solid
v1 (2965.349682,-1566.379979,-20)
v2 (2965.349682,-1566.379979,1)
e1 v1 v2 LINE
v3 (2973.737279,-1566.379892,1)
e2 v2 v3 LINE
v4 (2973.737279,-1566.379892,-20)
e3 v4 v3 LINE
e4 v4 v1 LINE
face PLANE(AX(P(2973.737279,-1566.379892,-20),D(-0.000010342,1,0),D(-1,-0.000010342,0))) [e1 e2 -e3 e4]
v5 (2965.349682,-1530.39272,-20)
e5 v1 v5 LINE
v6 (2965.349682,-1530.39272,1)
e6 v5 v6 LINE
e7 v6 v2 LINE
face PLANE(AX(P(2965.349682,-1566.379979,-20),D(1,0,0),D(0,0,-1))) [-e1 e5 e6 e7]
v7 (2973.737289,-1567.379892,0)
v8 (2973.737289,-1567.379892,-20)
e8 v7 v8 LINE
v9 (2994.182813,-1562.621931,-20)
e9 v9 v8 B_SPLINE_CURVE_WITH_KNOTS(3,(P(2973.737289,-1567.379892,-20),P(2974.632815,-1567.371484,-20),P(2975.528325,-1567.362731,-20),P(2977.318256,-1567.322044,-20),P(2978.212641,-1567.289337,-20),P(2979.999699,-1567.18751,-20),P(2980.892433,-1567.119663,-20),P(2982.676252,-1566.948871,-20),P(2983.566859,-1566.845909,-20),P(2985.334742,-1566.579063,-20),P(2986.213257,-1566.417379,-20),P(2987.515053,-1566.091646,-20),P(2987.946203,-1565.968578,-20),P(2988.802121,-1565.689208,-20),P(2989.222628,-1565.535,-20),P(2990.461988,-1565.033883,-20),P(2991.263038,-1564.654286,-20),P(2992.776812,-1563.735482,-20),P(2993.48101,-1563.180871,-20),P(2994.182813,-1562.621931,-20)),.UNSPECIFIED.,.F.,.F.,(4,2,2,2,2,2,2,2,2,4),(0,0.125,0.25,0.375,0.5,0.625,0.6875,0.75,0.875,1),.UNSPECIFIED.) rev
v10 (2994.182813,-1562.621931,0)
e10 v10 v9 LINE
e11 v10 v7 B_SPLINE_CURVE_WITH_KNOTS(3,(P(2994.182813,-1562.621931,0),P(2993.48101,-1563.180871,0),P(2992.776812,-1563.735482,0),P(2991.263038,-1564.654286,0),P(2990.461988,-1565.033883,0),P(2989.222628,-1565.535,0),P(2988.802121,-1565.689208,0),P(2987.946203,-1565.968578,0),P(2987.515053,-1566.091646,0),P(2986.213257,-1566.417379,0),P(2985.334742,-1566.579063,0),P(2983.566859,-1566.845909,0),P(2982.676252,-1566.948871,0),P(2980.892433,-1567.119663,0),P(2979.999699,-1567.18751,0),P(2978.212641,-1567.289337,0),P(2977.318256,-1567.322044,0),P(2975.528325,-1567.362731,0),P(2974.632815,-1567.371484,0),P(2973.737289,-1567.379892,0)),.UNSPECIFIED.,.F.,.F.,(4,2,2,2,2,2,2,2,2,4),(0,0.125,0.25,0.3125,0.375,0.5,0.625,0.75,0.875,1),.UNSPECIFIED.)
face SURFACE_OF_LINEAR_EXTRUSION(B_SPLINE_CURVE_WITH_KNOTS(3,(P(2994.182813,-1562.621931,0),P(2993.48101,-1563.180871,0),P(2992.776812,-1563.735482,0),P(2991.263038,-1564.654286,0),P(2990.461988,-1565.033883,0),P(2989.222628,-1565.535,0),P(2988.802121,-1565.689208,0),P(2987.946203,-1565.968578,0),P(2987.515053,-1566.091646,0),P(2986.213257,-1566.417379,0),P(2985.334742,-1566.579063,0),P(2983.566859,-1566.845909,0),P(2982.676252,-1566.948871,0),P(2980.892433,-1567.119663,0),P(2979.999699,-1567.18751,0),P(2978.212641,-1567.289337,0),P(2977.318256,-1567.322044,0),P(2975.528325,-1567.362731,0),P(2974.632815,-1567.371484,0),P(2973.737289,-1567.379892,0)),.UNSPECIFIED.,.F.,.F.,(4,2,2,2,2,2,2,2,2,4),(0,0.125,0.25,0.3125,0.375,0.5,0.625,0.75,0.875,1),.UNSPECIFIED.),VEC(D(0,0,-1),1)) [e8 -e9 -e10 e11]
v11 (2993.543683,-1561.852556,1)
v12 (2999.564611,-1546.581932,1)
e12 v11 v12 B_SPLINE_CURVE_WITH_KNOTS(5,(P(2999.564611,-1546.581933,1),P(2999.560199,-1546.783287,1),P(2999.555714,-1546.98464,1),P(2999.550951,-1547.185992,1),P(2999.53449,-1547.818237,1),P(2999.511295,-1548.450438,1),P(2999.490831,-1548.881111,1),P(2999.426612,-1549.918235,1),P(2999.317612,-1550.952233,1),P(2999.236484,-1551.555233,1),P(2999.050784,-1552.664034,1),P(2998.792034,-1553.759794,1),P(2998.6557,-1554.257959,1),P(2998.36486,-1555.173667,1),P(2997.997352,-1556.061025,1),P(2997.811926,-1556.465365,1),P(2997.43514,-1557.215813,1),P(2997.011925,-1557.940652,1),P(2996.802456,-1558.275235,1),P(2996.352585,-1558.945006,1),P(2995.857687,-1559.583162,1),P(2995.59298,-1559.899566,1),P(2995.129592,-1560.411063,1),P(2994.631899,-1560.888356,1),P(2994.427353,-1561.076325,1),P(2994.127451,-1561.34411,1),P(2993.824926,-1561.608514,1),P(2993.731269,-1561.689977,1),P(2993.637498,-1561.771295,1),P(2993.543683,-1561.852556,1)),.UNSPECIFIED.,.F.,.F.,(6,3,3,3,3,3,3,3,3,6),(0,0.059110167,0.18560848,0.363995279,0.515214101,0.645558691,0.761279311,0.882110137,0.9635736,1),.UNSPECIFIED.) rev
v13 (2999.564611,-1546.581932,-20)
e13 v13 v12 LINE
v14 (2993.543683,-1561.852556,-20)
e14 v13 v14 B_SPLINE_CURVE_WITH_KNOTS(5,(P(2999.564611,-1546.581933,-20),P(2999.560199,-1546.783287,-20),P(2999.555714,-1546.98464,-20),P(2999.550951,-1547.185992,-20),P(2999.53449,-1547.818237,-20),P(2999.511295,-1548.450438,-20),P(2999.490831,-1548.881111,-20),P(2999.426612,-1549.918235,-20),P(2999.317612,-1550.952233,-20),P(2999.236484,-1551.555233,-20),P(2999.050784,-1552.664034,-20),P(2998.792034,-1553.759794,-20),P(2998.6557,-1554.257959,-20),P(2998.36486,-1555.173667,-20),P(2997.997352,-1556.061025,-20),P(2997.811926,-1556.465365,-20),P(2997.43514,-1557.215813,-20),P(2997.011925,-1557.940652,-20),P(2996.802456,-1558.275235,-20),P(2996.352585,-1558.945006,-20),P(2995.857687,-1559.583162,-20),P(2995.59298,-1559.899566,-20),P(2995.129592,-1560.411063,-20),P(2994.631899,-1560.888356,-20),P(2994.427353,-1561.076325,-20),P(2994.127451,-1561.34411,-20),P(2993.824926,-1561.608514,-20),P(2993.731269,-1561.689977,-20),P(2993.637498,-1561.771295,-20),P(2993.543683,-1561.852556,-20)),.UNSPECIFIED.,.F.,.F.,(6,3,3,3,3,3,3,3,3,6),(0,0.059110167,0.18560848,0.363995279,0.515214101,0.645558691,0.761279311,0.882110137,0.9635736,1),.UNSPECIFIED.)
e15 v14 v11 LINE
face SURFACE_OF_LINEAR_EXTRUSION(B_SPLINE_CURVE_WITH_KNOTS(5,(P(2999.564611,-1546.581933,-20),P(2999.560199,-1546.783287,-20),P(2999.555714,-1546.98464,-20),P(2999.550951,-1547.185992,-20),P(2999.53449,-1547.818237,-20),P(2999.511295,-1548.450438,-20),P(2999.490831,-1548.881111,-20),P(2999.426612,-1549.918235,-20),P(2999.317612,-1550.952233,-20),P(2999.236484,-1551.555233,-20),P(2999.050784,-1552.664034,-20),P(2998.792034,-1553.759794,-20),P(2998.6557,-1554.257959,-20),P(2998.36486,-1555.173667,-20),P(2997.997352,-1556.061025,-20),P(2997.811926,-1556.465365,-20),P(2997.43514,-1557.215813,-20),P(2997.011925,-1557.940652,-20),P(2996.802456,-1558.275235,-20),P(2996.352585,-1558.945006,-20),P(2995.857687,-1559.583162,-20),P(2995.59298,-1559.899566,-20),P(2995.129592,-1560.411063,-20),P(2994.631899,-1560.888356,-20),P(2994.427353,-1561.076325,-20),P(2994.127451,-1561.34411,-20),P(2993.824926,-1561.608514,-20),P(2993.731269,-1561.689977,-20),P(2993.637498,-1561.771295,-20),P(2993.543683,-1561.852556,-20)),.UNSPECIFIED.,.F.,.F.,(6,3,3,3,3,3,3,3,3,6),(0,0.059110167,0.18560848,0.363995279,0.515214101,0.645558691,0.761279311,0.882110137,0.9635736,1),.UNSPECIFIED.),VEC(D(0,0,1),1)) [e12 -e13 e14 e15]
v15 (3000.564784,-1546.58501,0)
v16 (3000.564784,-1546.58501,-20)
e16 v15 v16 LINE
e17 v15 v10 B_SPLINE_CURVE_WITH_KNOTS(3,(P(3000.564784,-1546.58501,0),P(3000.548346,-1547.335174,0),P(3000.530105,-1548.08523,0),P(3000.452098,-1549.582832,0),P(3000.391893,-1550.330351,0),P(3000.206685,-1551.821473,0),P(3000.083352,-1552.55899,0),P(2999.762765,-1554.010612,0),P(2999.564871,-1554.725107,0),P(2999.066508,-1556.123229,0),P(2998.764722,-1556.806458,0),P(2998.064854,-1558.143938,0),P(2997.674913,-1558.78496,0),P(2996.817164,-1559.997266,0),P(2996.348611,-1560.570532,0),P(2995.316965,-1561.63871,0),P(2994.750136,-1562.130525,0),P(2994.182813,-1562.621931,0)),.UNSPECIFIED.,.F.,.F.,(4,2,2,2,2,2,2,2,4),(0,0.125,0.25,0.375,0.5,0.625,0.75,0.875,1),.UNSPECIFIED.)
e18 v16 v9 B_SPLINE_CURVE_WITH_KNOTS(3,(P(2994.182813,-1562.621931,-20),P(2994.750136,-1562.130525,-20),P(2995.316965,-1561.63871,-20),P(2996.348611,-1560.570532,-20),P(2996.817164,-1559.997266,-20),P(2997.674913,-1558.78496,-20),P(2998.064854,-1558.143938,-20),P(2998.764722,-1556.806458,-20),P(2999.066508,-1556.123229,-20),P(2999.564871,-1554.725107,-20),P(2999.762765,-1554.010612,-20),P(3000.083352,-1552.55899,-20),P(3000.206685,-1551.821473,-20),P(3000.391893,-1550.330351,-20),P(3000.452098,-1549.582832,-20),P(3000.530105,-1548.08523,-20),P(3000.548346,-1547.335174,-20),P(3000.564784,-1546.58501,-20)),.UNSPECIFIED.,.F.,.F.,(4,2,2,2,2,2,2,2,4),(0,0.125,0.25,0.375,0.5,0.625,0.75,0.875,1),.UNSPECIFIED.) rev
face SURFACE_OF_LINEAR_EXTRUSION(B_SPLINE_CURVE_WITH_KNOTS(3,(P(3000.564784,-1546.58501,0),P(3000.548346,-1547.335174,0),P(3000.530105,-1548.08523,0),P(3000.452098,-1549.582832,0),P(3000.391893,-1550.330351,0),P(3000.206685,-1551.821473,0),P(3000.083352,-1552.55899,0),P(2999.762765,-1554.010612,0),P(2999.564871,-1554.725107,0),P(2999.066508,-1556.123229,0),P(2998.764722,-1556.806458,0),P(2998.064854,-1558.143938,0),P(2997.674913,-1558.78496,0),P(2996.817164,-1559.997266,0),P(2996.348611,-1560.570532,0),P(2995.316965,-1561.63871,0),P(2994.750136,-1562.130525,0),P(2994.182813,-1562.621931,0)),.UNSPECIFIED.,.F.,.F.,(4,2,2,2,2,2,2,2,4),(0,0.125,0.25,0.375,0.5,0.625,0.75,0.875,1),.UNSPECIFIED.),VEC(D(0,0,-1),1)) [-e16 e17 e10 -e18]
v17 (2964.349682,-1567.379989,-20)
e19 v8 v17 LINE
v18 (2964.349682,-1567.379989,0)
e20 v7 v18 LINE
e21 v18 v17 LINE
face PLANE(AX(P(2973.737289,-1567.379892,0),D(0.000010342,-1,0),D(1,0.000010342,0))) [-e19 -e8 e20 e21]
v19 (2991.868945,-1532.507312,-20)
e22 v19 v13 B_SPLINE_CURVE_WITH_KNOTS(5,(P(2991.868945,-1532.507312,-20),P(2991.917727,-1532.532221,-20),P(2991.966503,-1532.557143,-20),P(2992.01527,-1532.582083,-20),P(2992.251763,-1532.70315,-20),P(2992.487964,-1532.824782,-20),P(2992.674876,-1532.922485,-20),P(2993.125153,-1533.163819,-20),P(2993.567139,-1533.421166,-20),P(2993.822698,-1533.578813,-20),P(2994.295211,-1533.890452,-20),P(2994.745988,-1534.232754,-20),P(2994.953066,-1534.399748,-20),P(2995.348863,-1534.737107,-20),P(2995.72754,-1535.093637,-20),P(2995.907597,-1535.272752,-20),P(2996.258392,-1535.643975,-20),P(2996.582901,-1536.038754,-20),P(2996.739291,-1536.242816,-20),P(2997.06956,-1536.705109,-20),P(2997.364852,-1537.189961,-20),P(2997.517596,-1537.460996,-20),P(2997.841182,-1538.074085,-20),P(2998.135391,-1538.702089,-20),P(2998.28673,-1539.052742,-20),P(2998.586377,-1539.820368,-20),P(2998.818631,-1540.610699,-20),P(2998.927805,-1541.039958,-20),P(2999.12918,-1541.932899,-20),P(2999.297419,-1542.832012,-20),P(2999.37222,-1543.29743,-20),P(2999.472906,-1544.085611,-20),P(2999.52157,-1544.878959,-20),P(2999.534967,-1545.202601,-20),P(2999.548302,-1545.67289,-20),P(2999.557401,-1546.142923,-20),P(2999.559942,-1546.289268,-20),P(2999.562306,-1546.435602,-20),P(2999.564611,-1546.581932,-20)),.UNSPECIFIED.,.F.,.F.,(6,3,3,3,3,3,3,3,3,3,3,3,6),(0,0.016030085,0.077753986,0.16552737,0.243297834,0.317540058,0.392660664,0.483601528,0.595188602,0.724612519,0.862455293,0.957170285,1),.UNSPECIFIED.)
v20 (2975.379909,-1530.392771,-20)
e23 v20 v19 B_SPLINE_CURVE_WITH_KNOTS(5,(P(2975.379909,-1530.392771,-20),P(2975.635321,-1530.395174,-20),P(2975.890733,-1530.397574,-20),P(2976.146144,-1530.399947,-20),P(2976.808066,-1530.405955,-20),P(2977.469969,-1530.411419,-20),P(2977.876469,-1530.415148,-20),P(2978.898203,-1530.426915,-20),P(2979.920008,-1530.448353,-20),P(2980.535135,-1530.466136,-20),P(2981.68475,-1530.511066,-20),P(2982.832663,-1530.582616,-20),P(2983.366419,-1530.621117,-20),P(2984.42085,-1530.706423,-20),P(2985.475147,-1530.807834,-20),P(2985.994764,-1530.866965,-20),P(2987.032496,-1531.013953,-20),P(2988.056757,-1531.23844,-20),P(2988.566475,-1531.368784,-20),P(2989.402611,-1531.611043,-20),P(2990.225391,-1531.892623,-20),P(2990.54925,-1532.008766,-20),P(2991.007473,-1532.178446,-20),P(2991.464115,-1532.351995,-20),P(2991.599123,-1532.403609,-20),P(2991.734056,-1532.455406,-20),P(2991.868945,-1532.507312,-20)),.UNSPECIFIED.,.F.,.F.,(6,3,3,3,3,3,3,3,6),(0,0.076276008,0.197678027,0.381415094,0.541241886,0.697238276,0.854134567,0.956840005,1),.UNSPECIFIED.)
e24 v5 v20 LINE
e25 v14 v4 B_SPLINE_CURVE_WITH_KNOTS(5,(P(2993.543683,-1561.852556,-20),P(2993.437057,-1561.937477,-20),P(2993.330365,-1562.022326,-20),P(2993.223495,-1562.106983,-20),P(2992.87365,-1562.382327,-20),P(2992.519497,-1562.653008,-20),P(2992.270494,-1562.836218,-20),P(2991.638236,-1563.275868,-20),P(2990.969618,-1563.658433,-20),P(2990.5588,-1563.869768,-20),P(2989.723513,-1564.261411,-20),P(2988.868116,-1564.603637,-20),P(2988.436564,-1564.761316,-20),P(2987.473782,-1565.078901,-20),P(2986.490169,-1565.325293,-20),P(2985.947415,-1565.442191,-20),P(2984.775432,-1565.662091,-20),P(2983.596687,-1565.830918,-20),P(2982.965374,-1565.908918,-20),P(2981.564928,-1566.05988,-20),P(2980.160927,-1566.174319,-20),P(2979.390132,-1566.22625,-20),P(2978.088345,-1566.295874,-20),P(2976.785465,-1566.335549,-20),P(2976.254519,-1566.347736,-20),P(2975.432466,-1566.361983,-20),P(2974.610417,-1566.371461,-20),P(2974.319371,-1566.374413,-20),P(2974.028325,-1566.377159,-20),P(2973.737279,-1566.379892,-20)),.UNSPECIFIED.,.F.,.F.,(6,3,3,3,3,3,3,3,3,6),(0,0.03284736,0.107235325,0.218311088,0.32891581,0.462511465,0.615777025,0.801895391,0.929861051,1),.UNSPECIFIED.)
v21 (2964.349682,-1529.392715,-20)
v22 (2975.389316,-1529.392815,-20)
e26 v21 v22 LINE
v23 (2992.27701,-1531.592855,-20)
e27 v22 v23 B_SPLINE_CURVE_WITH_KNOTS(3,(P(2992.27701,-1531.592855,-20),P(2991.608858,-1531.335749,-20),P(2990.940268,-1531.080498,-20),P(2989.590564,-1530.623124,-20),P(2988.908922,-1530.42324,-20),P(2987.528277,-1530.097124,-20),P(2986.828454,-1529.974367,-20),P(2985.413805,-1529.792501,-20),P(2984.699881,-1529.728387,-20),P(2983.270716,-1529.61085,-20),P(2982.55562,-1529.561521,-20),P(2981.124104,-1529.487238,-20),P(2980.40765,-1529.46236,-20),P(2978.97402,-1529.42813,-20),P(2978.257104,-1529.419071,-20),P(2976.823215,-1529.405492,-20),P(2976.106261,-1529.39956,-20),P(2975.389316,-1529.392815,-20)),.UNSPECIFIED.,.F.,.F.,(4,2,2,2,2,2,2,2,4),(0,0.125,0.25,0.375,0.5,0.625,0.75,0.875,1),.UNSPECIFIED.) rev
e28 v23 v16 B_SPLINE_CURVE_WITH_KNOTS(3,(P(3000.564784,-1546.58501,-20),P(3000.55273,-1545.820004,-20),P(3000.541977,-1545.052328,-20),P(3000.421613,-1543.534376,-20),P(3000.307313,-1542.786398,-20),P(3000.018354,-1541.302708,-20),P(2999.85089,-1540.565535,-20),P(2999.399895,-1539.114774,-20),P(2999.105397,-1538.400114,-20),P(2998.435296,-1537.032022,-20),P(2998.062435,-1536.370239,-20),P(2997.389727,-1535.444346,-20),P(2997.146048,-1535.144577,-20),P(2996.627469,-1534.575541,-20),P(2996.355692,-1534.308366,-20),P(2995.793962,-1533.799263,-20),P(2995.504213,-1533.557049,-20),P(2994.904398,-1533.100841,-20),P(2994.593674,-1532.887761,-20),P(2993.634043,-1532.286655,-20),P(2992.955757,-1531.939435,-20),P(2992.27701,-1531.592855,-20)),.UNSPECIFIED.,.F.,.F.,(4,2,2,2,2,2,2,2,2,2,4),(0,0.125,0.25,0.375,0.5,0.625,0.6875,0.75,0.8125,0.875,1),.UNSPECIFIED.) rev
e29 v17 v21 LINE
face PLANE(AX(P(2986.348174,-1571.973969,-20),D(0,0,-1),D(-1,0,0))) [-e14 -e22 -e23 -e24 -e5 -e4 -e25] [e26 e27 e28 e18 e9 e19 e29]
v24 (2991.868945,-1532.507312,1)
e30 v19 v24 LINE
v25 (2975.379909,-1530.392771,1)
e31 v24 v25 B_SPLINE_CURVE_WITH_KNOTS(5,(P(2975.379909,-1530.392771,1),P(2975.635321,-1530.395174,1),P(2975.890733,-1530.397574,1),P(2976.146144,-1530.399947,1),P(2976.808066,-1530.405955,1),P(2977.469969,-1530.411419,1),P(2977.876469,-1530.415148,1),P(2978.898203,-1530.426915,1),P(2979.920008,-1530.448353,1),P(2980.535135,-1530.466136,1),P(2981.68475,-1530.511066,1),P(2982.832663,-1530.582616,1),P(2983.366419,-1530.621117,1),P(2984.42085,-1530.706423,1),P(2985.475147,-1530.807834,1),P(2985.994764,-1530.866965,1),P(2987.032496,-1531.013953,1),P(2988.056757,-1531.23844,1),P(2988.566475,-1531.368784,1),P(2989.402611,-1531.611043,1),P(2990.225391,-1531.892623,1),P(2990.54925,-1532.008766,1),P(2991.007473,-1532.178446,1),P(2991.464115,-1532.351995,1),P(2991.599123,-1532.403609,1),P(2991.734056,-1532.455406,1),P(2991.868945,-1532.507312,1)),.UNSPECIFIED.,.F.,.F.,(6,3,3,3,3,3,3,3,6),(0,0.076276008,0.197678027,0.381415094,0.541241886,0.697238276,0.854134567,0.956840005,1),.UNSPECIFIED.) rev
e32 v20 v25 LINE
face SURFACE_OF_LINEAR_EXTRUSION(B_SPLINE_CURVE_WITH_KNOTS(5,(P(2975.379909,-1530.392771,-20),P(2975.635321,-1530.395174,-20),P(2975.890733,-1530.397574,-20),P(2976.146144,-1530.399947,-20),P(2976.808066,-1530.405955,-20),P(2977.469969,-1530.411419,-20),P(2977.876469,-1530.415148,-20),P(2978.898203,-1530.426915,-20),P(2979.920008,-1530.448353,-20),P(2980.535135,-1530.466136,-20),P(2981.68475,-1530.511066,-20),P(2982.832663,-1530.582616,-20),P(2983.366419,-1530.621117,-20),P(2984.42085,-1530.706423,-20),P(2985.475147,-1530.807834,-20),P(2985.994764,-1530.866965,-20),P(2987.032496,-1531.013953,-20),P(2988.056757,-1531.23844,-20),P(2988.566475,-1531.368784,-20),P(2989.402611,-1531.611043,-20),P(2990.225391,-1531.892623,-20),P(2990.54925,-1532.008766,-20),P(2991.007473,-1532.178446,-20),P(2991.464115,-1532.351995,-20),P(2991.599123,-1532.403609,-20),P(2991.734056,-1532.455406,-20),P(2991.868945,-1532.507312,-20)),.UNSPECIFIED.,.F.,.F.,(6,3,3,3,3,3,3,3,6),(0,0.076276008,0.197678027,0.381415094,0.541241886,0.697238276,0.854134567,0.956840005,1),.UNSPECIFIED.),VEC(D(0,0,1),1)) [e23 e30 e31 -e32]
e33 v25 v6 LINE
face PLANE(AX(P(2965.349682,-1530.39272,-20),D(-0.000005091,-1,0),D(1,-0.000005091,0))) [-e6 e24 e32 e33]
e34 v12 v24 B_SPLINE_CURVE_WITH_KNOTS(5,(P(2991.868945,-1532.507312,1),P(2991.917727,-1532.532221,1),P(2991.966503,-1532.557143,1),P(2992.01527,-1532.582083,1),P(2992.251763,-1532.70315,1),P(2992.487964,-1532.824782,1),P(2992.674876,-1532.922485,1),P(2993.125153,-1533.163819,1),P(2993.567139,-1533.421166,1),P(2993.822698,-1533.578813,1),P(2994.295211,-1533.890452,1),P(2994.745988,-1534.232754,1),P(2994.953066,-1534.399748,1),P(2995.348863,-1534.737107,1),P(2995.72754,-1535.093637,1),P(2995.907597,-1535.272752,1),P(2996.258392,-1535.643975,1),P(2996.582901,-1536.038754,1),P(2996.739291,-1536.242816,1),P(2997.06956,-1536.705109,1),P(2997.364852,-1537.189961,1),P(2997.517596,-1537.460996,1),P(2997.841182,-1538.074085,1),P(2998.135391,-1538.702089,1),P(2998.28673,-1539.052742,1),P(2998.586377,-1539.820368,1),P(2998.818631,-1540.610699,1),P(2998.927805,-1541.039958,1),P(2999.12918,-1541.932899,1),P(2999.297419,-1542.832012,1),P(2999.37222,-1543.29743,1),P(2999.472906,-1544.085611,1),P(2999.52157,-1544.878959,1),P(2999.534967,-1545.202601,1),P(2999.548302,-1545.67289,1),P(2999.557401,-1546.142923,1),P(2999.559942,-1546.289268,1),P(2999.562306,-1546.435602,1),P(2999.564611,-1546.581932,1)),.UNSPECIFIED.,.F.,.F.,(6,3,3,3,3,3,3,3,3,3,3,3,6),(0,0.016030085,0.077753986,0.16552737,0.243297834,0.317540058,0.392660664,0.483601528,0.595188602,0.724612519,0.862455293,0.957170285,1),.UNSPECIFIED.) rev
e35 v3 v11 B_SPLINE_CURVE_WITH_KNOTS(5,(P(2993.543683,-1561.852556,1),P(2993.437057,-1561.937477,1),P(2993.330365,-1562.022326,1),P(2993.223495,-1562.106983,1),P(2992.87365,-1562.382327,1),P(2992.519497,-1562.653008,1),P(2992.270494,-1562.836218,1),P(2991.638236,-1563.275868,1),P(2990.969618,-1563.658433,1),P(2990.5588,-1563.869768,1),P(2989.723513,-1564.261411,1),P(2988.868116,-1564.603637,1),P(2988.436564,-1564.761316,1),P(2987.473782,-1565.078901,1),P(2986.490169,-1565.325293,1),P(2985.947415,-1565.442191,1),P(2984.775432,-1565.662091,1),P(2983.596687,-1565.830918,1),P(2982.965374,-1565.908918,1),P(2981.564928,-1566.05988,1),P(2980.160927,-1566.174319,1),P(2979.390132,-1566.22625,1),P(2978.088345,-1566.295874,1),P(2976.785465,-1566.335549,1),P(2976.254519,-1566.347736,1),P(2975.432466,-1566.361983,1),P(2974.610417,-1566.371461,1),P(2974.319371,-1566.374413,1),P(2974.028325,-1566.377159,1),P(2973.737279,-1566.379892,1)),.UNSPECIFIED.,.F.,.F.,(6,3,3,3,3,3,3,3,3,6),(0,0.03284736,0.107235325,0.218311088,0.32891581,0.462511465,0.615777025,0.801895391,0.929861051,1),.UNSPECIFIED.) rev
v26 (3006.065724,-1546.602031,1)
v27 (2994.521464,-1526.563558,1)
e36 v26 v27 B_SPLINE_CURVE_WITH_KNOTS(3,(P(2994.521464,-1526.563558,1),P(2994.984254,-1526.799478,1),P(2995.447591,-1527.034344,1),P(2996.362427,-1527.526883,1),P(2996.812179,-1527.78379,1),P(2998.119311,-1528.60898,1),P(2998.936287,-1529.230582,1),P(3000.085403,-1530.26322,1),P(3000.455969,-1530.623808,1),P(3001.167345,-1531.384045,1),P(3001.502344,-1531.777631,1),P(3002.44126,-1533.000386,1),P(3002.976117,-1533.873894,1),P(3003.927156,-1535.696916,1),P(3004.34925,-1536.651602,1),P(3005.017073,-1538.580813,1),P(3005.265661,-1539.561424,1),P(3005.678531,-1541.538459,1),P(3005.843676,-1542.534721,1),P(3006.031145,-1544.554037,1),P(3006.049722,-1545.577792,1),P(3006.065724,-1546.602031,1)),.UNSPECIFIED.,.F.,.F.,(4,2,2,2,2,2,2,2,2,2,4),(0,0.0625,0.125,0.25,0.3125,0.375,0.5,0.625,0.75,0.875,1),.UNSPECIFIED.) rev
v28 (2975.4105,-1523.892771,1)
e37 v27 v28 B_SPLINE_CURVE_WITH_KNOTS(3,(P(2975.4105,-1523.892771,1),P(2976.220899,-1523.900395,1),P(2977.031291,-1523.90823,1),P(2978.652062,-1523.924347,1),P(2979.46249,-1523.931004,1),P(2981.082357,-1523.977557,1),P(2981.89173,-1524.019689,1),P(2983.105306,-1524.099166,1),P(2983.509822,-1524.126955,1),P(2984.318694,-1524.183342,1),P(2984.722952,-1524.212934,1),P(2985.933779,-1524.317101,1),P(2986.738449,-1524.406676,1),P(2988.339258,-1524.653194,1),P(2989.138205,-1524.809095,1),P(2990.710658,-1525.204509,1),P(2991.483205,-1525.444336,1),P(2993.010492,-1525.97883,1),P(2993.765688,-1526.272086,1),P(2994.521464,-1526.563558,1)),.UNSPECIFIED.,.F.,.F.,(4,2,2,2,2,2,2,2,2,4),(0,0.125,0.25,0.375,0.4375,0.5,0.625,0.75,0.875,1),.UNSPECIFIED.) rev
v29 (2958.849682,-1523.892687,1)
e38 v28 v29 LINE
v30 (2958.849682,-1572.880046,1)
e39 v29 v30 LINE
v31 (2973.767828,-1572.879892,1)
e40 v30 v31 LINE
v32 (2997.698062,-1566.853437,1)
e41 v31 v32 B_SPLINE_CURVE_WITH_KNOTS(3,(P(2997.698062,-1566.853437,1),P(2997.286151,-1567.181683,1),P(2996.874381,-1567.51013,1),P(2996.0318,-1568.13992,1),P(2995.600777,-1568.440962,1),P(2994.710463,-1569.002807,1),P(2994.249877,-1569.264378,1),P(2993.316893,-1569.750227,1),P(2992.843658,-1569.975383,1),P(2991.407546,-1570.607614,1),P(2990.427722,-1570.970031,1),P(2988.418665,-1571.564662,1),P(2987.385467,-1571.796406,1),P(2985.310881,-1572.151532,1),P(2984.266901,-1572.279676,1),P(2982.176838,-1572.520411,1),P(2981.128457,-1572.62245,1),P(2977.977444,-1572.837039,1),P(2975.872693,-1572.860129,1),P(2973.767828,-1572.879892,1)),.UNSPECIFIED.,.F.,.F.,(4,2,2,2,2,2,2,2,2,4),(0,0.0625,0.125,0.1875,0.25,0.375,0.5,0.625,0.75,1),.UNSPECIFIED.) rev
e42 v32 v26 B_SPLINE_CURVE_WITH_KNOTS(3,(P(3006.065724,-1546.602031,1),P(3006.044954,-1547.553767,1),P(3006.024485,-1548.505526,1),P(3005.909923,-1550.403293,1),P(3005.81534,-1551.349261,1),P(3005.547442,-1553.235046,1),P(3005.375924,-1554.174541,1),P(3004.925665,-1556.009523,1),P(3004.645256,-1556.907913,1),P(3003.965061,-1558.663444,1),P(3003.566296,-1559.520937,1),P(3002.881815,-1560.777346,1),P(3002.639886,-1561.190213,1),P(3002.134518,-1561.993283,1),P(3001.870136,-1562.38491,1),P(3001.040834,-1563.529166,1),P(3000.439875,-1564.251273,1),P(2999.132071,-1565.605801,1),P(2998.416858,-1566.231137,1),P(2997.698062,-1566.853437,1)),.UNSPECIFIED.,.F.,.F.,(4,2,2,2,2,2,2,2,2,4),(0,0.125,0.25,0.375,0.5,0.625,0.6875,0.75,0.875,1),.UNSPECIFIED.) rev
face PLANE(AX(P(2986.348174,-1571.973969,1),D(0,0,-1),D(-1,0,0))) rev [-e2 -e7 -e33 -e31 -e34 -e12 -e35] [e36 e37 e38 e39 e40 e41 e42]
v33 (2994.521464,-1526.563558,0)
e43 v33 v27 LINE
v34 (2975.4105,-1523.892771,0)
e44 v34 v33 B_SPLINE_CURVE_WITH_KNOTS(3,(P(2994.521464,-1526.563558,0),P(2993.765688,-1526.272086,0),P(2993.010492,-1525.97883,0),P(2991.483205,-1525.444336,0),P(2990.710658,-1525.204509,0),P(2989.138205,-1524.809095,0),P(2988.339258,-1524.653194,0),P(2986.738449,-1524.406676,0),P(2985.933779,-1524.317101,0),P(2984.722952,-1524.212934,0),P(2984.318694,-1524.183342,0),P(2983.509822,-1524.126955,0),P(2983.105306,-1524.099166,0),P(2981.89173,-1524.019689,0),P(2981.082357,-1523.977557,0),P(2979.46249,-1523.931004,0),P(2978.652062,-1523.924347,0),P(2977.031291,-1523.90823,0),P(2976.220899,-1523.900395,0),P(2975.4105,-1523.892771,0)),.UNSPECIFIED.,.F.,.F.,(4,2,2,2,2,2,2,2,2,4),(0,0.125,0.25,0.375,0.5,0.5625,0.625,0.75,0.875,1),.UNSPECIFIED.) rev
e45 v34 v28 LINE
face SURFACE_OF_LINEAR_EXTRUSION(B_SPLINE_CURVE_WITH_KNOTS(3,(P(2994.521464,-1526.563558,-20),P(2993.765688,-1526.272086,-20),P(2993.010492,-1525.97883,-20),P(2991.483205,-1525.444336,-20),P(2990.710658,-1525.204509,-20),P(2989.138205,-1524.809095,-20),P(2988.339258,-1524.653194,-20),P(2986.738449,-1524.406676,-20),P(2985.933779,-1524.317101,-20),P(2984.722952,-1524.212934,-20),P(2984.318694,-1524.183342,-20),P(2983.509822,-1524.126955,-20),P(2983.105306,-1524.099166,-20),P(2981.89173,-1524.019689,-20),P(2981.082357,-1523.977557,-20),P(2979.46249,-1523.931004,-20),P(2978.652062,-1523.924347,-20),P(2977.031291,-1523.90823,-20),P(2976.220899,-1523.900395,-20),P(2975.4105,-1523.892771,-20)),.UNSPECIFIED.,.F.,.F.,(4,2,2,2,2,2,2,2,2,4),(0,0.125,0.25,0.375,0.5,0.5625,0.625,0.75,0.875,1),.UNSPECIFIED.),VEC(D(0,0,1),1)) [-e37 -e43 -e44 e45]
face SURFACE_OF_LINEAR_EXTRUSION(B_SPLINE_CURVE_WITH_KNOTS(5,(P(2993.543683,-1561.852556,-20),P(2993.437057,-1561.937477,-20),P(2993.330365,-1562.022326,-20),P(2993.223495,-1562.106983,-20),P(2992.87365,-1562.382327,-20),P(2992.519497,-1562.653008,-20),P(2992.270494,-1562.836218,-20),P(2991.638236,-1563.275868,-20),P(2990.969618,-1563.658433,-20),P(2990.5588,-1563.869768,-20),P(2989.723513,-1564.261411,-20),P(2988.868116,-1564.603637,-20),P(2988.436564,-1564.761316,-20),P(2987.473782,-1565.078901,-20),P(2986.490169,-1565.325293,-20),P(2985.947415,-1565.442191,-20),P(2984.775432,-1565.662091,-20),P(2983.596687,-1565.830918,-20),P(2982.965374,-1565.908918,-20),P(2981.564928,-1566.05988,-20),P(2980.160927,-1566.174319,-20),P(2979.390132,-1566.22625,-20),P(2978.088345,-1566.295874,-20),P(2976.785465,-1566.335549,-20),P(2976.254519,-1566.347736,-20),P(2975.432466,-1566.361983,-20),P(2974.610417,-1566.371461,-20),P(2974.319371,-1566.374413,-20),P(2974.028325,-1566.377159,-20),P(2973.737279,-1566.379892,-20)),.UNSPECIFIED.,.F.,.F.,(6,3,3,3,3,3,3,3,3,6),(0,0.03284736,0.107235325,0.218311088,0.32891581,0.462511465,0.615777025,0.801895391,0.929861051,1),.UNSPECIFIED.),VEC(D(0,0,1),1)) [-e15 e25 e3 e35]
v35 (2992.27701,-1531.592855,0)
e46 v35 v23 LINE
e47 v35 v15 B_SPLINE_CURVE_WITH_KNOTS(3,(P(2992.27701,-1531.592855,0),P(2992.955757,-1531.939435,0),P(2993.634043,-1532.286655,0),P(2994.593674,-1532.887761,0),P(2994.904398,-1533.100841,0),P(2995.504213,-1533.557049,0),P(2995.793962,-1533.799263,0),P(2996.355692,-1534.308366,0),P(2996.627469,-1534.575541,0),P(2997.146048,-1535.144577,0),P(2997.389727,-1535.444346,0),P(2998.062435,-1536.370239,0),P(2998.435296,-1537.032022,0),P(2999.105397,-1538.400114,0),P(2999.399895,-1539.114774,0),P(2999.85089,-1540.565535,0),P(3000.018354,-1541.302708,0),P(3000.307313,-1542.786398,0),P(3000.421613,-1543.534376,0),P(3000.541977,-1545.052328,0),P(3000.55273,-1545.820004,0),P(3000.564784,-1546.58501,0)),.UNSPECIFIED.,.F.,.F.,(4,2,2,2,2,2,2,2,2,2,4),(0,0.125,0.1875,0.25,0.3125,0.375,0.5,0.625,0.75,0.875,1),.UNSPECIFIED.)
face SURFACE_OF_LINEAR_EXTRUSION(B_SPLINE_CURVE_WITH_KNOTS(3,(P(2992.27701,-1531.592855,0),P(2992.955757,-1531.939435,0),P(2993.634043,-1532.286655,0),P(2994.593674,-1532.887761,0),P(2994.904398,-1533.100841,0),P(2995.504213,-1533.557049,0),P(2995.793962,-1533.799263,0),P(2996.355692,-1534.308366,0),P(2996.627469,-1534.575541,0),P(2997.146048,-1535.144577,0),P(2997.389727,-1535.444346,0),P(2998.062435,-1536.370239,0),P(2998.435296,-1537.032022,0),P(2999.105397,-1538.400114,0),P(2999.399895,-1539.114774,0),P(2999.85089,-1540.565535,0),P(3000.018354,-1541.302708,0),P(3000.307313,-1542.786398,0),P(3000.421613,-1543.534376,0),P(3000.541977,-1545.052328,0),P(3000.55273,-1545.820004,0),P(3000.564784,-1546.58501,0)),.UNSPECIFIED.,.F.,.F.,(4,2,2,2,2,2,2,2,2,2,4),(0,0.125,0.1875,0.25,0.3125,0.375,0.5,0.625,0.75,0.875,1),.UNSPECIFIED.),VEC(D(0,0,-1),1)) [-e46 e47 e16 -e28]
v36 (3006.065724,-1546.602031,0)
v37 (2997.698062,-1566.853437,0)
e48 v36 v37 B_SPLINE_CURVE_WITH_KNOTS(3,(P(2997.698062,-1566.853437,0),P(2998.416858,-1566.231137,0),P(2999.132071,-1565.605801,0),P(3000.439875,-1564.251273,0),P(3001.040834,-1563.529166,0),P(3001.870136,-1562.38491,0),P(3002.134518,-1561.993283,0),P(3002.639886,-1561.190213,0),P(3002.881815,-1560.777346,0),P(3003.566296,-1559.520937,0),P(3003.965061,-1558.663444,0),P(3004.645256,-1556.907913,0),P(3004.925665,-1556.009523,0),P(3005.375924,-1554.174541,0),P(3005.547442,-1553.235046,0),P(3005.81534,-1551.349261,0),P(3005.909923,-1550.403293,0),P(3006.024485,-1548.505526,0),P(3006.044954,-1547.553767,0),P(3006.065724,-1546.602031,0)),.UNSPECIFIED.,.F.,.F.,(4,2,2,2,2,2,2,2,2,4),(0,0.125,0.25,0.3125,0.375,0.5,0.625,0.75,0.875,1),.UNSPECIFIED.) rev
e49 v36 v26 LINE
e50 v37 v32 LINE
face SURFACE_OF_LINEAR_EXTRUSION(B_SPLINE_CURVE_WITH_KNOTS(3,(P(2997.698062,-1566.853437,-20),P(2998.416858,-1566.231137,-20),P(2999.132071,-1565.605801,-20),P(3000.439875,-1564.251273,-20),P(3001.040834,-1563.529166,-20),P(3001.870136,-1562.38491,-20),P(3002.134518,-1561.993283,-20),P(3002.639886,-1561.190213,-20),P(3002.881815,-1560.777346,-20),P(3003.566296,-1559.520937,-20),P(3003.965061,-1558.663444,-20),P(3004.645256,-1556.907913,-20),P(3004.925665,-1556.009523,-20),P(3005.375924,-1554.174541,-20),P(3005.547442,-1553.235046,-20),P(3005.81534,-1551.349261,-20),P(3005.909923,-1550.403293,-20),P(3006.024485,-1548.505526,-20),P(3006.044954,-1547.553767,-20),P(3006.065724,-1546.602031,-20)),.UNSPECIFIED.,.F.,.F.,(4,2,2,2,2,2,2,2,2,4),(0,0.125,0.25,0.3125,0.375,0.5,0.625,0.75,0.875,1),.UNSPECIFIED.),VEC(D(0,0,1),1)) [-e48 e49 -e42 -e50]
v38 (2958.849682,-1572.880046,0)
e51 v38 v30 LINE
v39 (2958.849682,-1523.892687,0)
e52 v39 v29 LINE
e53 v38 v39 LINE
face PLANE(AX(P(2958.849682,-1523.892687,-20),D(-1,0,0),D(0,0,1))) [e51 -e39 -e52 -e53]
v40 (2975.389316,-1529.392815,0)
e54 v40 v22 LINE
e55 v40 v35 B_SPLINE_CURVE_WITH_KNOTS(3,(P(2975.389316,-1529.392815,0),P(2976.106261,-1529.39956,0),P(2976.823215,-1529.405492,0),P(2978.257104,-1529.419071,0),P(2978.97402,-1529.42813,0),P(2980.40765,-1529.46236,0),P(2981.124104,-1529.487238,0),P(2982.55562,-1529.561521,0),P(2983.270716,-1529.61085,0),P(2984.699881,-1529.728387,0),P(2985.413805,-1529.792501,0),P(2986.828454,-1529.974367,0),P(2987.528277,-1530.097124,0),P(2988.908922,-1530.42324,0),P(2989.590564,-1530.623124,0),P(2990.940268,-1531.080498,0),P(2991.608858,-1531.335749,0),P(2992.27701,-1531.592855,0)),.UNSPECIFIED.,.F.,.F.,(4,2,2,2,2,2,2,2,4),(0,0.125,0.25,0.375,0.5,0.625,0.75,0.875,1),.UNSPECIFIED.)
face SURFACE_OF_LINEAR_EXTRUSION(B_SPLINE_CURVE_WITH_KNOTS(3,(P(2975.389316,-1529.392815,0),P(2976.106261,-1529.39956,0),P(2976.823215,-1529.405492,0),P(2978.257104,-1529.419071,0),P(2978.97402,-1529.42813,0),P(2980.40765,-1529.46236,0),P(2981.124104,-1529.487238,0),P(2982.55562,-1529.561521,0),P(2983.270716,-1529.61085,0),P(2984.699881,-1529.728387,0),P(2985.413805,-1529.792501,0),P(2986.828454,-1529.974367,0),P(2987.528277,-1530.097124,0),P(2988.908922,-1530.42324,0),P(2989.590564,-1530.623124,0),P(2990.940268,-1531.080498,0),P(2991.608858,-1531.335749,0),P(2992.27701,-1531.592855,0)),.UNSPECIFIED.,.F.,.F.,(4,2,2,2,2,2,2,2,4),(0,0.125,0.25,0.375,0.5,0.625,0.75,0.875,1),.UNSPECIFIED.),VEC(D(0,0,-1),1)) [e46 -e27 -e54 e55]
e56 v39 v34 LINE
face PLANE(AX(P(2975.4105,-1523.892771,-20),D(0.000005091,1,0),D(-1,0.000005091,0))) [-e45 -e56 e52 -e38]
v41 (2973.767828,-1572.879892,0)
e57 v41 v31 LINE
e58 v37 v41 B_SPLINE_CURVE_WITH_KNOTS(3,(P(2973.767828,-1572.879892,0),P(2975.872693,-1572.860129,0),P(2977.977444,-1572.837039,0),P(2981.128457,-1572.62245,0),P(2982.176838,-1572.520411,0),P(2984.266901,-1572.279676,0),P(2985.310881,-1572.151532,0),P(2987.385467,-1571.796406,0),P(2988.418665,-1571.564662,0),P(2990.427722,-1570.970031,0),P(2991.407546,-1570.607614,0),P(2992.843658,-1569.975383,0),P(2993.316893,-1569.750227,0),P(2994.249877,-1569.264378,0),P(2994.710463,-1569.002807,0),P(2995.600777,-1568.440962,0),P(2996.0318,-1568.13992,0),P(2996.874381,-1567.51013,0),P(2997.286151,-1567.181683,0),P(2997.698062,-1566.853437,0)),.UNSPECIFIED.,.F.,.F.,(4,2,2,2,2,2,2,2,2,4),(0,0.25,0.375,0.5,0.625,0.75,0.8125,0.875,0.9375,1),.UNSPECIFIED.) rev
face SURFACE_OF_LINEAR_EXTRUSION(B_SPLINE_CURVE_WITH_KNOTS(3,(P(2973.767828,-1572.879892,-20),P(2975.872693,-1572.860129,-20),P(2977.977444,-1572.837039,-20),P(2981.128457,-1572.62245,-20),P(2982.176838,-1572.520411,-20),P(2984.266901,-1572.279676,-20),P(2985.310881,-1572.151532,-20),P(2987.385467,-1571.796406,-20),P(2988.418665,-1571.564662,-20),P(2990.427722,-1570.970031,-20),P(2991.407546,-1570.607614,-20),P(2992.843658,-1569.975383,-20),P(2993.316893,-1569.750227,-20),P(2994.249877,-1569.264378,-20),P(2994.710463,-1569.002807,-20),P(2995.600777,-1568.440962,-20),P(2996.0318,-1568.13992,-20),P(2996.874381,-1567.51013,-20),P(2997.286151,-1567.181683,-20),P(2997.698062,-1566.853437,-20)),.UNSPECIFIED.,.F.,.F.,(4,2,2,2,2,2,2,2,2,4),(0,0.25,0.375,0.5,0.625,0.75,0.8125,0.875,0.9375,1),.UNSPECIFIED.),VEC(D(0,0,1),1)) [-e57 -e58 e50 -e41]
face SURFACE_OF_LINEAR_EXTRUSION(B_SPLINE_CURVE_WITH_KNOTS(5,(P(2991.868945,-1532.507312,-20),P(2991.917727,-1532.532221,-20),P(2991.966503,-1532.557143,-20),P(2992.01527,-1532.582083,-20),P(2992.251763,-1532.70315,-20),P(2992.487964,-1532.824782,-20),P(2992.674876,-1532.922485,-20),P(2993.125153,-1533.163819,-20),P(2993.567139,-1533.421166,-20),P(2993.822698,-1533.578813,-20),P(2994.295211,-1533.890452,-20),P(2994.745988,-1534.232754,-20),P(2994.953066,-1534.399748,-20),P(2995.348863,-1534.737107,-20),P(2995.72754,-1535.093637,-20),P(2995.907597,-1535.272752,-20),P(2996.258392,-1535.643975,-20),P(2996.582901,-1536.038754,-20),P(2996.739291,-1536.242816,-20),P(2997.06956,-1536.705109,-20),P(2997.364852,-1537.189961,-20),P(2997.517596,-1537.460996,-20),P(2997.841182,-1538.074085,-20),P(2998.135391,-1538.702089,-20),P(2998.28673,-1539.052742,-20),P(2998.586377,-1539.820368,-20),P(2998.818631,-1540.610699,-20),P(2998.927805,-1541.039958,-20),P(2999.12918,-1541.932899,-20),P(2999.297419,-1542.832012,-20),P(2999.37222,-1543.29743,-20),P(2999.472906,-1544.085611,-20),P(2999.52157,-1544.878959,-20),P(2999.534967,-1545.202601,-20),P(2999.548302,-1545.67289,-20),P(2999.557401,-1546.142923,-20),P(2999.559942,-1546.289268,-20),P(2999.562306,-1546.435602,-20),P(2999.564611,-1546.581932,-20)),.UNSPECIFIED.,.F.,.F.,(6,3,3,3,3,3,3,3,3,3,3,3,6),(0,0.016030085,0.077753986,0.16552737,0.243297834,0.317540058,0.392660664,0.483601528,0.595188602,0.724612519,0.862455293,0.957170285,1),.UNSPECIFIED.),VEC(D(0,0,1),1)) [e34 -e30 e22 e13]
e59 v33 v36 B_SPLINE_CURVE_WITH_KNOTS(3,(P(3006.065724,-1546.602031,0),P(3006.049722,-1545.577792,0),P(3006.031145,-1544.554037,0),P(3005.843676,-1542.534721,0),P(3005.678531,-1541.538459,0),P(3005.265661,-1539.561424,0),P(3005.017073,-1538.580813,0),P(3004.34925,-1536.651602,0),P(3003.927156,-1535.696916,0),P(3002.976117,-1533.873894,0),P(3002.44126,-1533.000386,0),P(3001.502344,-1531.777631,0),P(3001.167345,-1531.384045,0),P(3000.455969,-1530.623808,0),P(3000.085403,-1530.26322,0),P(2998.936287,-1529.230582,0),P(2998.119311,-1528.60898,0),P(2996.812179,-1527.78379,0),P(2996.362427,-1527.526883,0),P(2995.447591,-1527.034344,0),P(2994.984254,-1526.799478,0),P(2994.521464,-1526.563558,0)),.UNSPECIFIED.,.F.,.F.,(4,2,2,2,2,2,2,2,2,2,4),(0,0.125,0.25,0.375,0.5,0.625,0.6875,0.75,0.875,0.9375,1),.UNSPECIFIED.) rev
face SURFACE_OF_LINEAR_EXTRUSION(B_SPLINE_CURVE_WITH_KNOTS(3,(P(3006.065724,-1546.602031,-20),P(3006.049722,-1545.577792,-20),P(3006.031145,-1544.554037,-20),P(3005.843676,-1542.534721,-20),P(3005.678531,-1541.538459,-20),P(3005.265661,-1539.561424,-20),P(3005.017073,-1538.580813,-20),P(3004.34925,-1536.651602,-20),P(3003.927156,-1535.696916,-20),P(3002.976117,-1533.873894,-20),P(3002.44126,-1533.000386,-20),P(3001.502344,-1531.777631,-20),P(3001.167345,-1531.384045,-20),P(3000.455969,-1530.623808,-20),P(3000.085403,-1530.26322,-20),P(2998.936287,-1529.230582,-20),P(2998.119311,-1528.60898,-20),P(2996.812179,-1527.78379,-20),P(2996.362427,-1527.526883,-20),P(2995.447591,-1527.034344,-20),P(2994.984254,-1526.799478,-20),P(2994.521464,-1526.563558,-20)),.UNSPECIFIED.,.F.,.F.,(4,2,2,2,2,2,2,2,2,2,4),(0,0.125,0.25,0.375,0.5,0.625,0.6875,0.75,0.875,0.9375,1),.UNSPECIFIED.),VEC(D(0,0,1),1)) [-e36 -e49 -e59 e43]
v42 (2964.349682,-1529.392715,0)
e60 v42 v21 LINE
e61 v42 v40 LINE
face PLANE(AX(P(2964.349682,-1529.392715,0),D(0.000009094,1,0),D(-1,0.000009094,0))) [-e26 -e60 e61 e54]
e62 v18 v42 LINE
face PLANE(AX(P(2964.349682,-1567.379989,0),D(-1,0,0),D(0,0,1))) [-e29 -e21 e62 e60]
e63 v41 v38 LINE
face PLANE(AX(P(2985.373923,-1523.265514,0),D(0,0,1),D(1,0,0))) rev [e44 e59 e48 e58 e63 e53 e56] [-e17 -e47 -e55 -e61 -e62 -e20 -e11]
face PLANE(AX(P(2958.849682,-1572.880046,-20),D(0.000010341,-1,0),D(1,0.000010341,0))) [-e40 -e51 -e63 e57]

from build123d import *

# Parameters (mm, degrees)
BOSS_EXTRUDE1_DEPTH      = 1
BOSS_EXTRUDE1_DEPTH_BACK = 20
CUT_EXTRUDE1_START       = -20
CUT_EXTRUDE1_DEPTH       = 21
CUT_EXTRUDE2_DEPTH       = 20


with BuildPart() as part:
    # Sketch1 → Boss-Extrude1 (new, two sides: drawn at the far end of the back side and taken through both)
    with BuildSketch(Plane.XY.offset(-BOSS_EXTRUDE1_DEPTH_BACK)):
        with BuildLine():
            Line((2958.849681818, -1523.892686603), (2958.849681818, -1572.880046193))
            Line((2958.849681818, -1572.880046193), (2973.767827756, -1572.879891925))
            add(Edge.make_bspline(
                [(2973.767827756, -1572.879891925), (2975.872692571, -1572.860128702), (2977.97744433, -1572.837038501), (2981.128456873, -1572.622449637), (2982.176837562, -1572.520411147), (2984.266901408, -1572.279675791), (2985.310881123, -1572.151531628), (2987.385467262, -1571.796406217), (2988.418665053, -1571.564661717), (2990.42772202, -1570.970030606), (2991.407545952, -1570.607613705), (2992.843658133, -1569.975383258), (2993.316892991, -1569.750227353), (2994.249877125, -1569.26437839), (2994.710462552, -1569.002807433), (2995.600777329, -1568.440961858), (2996.03179999, -1568.139919647), (2996.874381171, -1567.510129893), (2997.286151137, -1567.181683323), (2997.698061708, -1566.853436892)],
                knots=[0, 0, 0, 0, 0.25, 0.25, 0.375, 0.375, 0.5, 0.5, 0.625, 0.625, 0.75, 0.75, 0.8125, 0.8125, 0.875, 0.875, 0.9375, 0.9375, 1, 1, 1, 1], degree=3))
            add(Edge.make_bspline(
                [(2997.698061708, -1566.853436892), (2998.416858499, -1566.231137048), (2999.132070809, -1565.605801223), (3000.439874878, -1564.251272502), (3001.040833723, -1563.529166355), (3001.870136359, -1562.384909745), (3002.134518134, -1561.99328271), (3002.639885881, -1561.190212879), (3002.88181464, -1560.777345774), (3003.56629642, -1559.520937412), (3003.965060607, -1558.663443678), (3004.645255929, -1556.907913122), (3004.925665177, -1556.009523199), (3005.375924175, -1554.174540788), (3005.547442261, -1553.235046422), (3005.815340161, -1551.349261322), (3005.909922946, -1550.403292778), (3006.024485076, -1548.505526326), (3006.044953808, -1547.553766658), (3006.065724013, -1546.602030546)],
                knots=[0, 0, 0, 0, 0.125, 0.125, 0.25, 0.25, 0.3125, 0.3125, 0.375, 0.375, 0.5, 0.5, 0.625, 0.625, 0.75, 0.75, 0.875, 0.875, 1, 1, 1, 1], degree=3))
            add(Edge.make_bspline(
                [(3006.065724013, -1546.602030546), (3006.04972175, -1545.577792039), (3006.031144664, -1544.554036514), (3005.843675505, -1542.534721285), (3005.678530811, -1541.538458655), (3005.265660908, -1539.561423704), (3005.017072922, -1538.580813221), (3004.349249805, -1536.651601947), (3003.927156281, -1535.69691585), (3002.976116906, -1533.87389373), (3002.441259888, -1533.000385871), (3001.502343695, -1531.777630592), (3001.167345475, -1531.384044934), (3000.455968626, -1530.623807652), (3000.085403132, -1530.263220064), (2998.936287392, -1529.230582402), (2998.119310629, -1528.608979786), (2996.812178732, -1527.783790373), (2996.362427394, -1527.526882528), (2995.447591339, -1527.034344288), (2994.984254165, -1526.799477811), (2994.521463917, -1526.563557737)],
                knots=[0, 0, 0, 0, 0.125, 0.125, 0.25, 0.25, 0.375, 0.375, 0.5, 0.5, 0.625, 0.625, 0.6875, 0.6875, 0.75, 0.75, 0.875, 0.875, 0.9375, 0.9375, 1, 1, 1, 1], degree=3))
            add(Edge.make_bspline(
                [(2994.521463917, -1526.563557737), (2993.765688091, -1526.272085638), (2993.010491549, -1525.978829783), (2991.483205477, -1525.44433573), (2990.710657636, -1525.204508785), (2989.138204589, -1524.809094938), (2988.339258152, -1524.653193843), (2986.738448585, -1524.406676163), (2985.933779187, -1524.317100974), (2984.722952021, -1524.212934338), (2984.318693535, -1524.183341594), (2983.509822186, -1524.126955112), (2983.105306438, -1524.099165519), (2981.891730085, -1524.019688984), (2981.082356745, -1523.977557139), (2979.462489648, -1523.931004115), (2978.652062316, -1523.924347209), (2977.031290954, -1523.90822966), (2976.220898612, -1523.900395057), (2975.410500017, -1523.892770911)],
                knots=[0, 0, 0, 0, 0.125, 0.125, 0.25, 0.25, 0.375, 0.375, 0.5, 0.5, 0.5625, 0.5625, 0.625, 0.625, 0.75, 0.75, 0.875, 0.875, 1, 1, 1, 1], degree=3))
            Line((2975.410500017, -1523.892770911), (2958.849681818, -1523.892686603))
        make_face()
    extrude(amount=BOSS_EXTRUDE1_DEPTH + BOSS_EXTRUDE1_DEPTH_BACK)

    # Cut-Extrude1: read off the stored shape, not the designer's step
    # Cut-Extrude1 outline → Cut-Extrude1 (cut)
    with BuildSketch(Plane.XY.offset(CUT_EXTRUDE1_START)):
        with BuildLine():
            add(Edge.make_bspline(
                [(2999.564611356, -1546.581932516), (2999.560199289, -1546.783286703), (2999.555713556, -1546.984640418), (2999.550951057, -1547.185992362), (2999.534489795, -1547.818236531), (2999.511294548, -1548.450437603), (2999.490831378, -1548.881110798), (2999.426611827, -1549.918234738), (2999.317611548, -1550.952232563), (2999.236483512, -1551.555232979), (2999.050783989, -1552.664033717), (2998.792033815, -1553.759793947), (2998.6557005, -1554.257958858), (2998.364859869, -1555.173667396), (2997.997352466, -1556.061024659), (2997.811925548, -1556.465364546), (2997.43514021, -1557.215812724), (2997.011924898, -1557.940652406), (2996.802455573, -1558.275235324), (2996.352584868, -1558.945006303), (2995.85768673, -1559.583161975), (2995.59297997, -1559.899565762), (2995.129592401, -1560.411063384), (2994.63189911, -1560.888356369), (2994.427352751, -1561.076325072), (2994.127451293, -1561.344110455), (2993.824926371, -1561.608514143), (2993.731268531, -1561.689977202), (2993.637497837, -1561.77129479), (2993.543683098, -1561.852555602)],
                knots=[0, 0, 0, 0, 0, 0, 0.059110167, 0.059110167, 0.059110167, 0.18560848, 0.18560848, 0.18560848, 0.363995279, 0.363995279, 0.363995279, 0.515214101, 0.515214101, 0.515214101, 0.645558691, 0.645558691, 0.645558691, 0.761279311, 0.761279311, 0.761279311, 0.882110137, 0.882110137, 0.882110137, 0.9635736, 0.9635736, 0.9635736, 1, 1, 1, 1, 1, 1], degree=5))
            add(Edge.make_bspline(
                [(2991.86894481, -1532.507311664), (2991.917727188, -1532.532220868), (2991.966502744, -1532.557143307), (2992.015269625, -1532.582082572), (2992.251762506, -1532.703149616), (2992.487964167, -1532.824781606), (2992.674876093, -1532.922484624), (2993.125152768, -1533.163819253), (2993.567139203, -1533.421165934), (2993.822697838, -1533.578813476), (2994.295211081, -1533.89045171), (2994.745988195, -1534.232754351), (2994.953066018, -1534.399748188), (2995.348862625, -1534.737107468), (2995.727539885, -1535.093636559), (2995.9075968, -1535.272751981), (2996.258392012, -1535.643974504), (2996.582901118, -1536.038753857), (2996.739291373, -1536.242815654), (2997.069559841, -1536.705108563), (2997.364851967, -1537.189961311), (2997.517596496, -1537.460995945), (2997.841182076, -1538.074085206), (2998.135390571, -1538.70208923), (2998.286730018, -1539.052742318), (2998.586377385, -1539.820367574), (2998.818630505, -1540.610699075), (2998.927804824, -1541.039958158), (2999.12917984, -1541.932899013), (2999.297418906, -1542.832012438), (2999.372220021, -1543.297429752), (2999.47290564, -1544.085611102), (2999.521569818, -1544.87895901), (2999.534967442, -1545.202600808), (2999.548302092, -1545.672889571), (2999.55740139, -1546.142922786), (2999.559941505, -1546.289267601), (2999.562305702, -1546.435601801), (2999.564611356, -1546.581932516)],
                knots=[0, 0, 0, 0, 0, 0, 0.016030085, 0.016030085, 0.016030085, 0.077753986, 0.077753986, 0.077753986, 0.16552737, 0.16552737, 0.16552737, 0.243297834, 0.243297834, 0.243297834, 0.317540058, 0.317540058, 0.317540058, 0.392660664, 0.392660664, 0.392660664, 0.483601528, 0.483601528, 0.483601528, 0.595188602, 0.595188602, 0.595188602, 0.724612519, 0.724612519, 0.724612519, 0.862455293, 0.862455293, 0.862455293, 0.957170285, 0.957170285, 0.957170285, 1, 1, 1, 1, 1, 1], degree=5))
            add(Edge.make_bspline(
                [(2975.379908678, -1530.392770753), (2975.635320758, -1530.395173553), (2975.890732771, -1530.397574462), (2976.146143794, -1530.399947135), (2976.8080658, -1530.40595474), (2977.469968724, -1530.411418814), (2977.87646884, -1530.415148123), (2978.89820325, -1530.426914914), (2979.920008426, -1530.448352542), (2980.53513518, -1530.466136469), (2981.684749787, -1530.511066357), (2982.832663167, -1530.582616061), (2983.366418547, -1530.621116564), (2984.420849653, -1530.706422764), (2985.4751468, -1530.807833622), (2985.994763952, -1530.86696457), (2987.032496202, -1531.013952985), (2988.056756518, -1531.238439658), (2988.566475319, -1531.3687841), (2989.402610593, -1531.61104315), (2990.225391079, -1531.892622818), (2990.549250324, -1532.008765811), (2991.007473299, -1532.178445738), (2991.464114808, -1532.351995365), (2991.599123107, -1532.403608526), (2991.734055949, -1532.455406322), (2991.86894481, -1532.507311664)],
                knots=[0, 0, 0, 0, 0, 0, 0.076276008, 0.076276008, 0.076276008, 0.197678027, 0.197678027, 0.197678027, 0.381415094, 0.381415094, 0.381415094, 0.541241886, 0.541241886, 0.541241886, 0.697238276, 0.697238276, 0.697238276, 0.854134567, 0.854134567, 0.854134567, 0.956840005, 0.956840005, 0.956840005, 1, 1, 1, 1, 1, 1], degree=5))
            Line((2975.379908678, -1530.392770753), (2965.349681818, -1530.392719693))
            Line((2965.349681818, -1530.392719693), (2965.349681818, -1566.379978977))
            Line((2965.349681818, -1566.379978977), (2973.737278623, -1566.379892232))
            add(Edge.make_bspline(
                [(2993.543683098, -1561.852555602), (2993.43705716, -1561.937476509), (2993.330365459, -1562.022326296), (2993.223495243, -1562.106982773), (2992.873649724, -1562.382327169), (2992.519497173, -1562.653007554), (2992.270493978, -1562.836218126), (2991.638235683, -1563.275868304), (2990.969618174, -1563.658432897), (2990.558800189, -1563.869767569), (2989.723512863, -1564.261411184), (2988.868115868, -1564.603636603), (2988.436564341, -1564.761316131), (2987.473782291, -1565.078900946), (2986.490169119, -1565.325293296), (2985.947414782, -1565.442190979), (2984.775432084, -1565.662090525), (2983.59668737, -1565.830917986), (2982.965373607, -1565.908917719), (2981.564927724, -1566.059879807), (2980.16092745, -1566.174319224), (2979.390132346, -1566.226249634), (2978.088344511, -1566.295874359), (2976.785464801, -1566.335549007), (2976.254518882, -1566.347735739), (2975.43246573, -1566.361982789), (2974.610416716, -1566.371460546), (2974.319370561, -1566.3744135), (2974.028324587, -1566.377158998), (2973.737278623, -1566.379892232)],
                knots=[0, 0, 0, 0, 0, 0, 0.03284736, 0.03284736, 0.03284736, 0.107235325, 0.107235325, 0.107235325, 0.218311088, 0.218311088, 0.218311088, 0.32891581, 0.32891581, 0.32891581, 0.462511465, 0.462511465, 0.462511465, 0.615777025, 0.615777025, 0.615777025, 0.801895391, 0.801895391, 0.801895391, 0.929861051, 0.929861051, 0.929861051, 1, 1, 1, 1, 1, 1], degree=5))
        make_face()
    extrude(amount=CUT_EXTRUDE1_DEPTH, mode=Mode.SUBTRACT)

    # Sketch2 → Cut-Extrude2 (cut)
    with BuildSketch(Plane(origin=(0, 0, -20), x_dir=(-1, 0, 0), z_dir=(0, 0, -1))):
        with BuildLine():
            Line((-2957.849681818, -1522.892681513), (-2975.419907498, -1522.892815162))
            add(Edge.make_bspline(
                [(-2975.419907498, -1522.892815162), (-2976.250334374, -1522.900627732), (-2977.080757395, -1522.908729242), (-2978.741600844, -1522.925126531), (-2979.572036658, -1522.932269269), (-2981.232420395, -1522.983118316), (-2982.061496977, -1523.02818346), (-2983.718289186, -1523.137727375), (-2984.546744697, -1523.191563766), (-2987.028279746, -1523.413413606), (-2988.662085857, -1523.652133805), (-2991.047633593, -1524.261413977), (-2991.832280311, -1524.506234688), (-2993.387380634, -1525.052088003), (-2994.158200037, -1525.351671856), (-2994.929550957, -1525.649150637)],
                knots=[0, 0, 0, 0, 0.125, 0.125, 0.25, 0.25, 0.375, 0.375, 0.5, 0.5, 0.75, 0.75, 0.875, 0.875, 1, 1, 1, 1], degree=3))
            add(Edge.make_bspline(
                [(-2994.929550957, -1525.649150637), (-2995.409232135, -1525.893681329), (-2995.889730359, -1526.137017698), (-2996.835714913, -1526.645634188), (-2997.301119322, -1526.911034055), (-2998.658245611, -1527.764369291), (-2999.511453788, -1528.408602358), (-3000.71686701, -1529.483705329), (-3001.108604608, -1529.862021994), (-3001.851318486, -1530.647739857), (-3002.202171297, -1531.054671595), (-3003.189581135, -1532.320180911), (-3003.756855155, -1533.226310201), (-3004.512885574, -1534.650624513), (-3004.750968055, -1535.13749972), (-3005.190118191, -1536.122972609), (-3005.3908103, -1536.620756117), (-3005.929075328, -1538.131162213), (-3006.199138362, -1539.161828937), (-3006.643661707, -1541.248715215), (-3006.823045805, -1542.305802987), (-3007.02935589, -1544.451457064), (-3007.049069381, -1545.528225293), (-3007.065894477, -1546.605129948)],
                knots=[0, 0, 0, 0, 0.0625, 0.0625, 0.125, 0.125, 0.25, 0.25, 0.3125, 0.3125, 0.375, 0.375, 0.5, 0.5, 0.5625, 0.5625, 0.625, 0.625, 0.75, 0.75, 0.875, 0.875, 1, 1, 1, 1], degree=3))
            add(Edge.make_bspline(
                [(-3007.065894477, -1546.605129948), (-3007.044456506, -1547.58746456), (-3007.023250298, -1548.569833279), (-3006.903650049, -1550.523211261), (-3006.805488623, -1551.494254756), (-3006.52981926, -1553.424664605), (-3006.354332297, -1554.384328378), (-3006.003932348, -1555.810995614), (-3005.872235213, -1556.284358998), (-3005.576811436, -1557.2263721), (-3005.412396416, -1557.69660213), (-3004.87476536, -1559.081940399), (-3004.457658857, -1559.975471603), (-3003.750003335, -1561.273813802), (-3003.500626365, -1561.699691216), (-3002.973960243, -1562.537164273), (-3002.695606216, -1562.94988624), (-3001.824010444, -1564.152822926), (-3001.193978684, -1564.90932261), (-2999.828664579, -1566.3246153), (-2999.084867353, -1566.975503732), (-2998.337199384, -1567.622798859)],
                knots=[0, 0, 0, 0, 0.125, 0.125, 0.25, 0.25, 0.375, 0.375, 0.4375, 0.4375, 0.5, 0.5, 0.625, 0.625, 0.6875, 0.6875, 0.75, 0.75, 0.875, 0.875, 1, 1, 1, 1], degree=3))
            add(Edge.make_bspline(
                [(-2998.337199384, -1567.622798859), (-2997.913365817, -1567.960545411), (-2997.489658147, -1568.298519089), (-2996.625716683, -1568.94465248), (-2996.185361463, -1569.252593133), (-2994.829537971, -1570.113710199), (-2993.879873151, -1570.605194306), (-2992.410454455, -1571.261379859), (-2991.912946257, -1571.466213641), (-2990.901256815, -1571.845802181), (-2990.385362373, -1572.021050891), (-2988.827863795, -1572.493428008), (-2987.774736228, -1572.736832692), (-2985.6459865, -1573.114913088), (-2984.569922437, -1573.250376528), (-2982.416450681, -1573.500248094), (-2981.338757126, -1573.608089569), (-2978.100277906, -1573.835251204), (-2975.934169133, -1573.859555227), (-2973.767838097, -1573.879891925)],
                knots=[0, 0, 0, 0, 0.0625, 0.0625, 0.125, 0.125, 0.25, 0.25, 0.3125, 0.3125, 0.375, 0.375, 0.5, 0.5, 0.625, 0.625, 0.75, 0.75, 1, 1, 1, 1], degree=3))
            Line((-2973.767838097, -1573.879891925), (-2957.849681818, -1573.880056534))
            Line((-2957.849681818, -1573.880056534), (-2957.849681818, -1522.892681513))
        make_face()
        with BuildLine():
            Line((-2973.737288965, -1567.379892231), (-2964.349681818, -1567.379989319))
            Line((-2964.349681818, -1567.379989319), (-2964.349681818, -1529.392714603))
            Line((-2964.349681818, -1529.392714603), (-2975.389315804, -1529.392815001))
            add(Edge.make_bspline(
                [(-2975.389315804, -1529.392815001), (-2976.106260535, -1529.399559689), (-2976.823215402, -1529.405491602), (-2978.257103741, -1529.419071074), (-2978.974019618, -1529.428129562), (-2980.407650434, -1529.462359736), (-2981.124104007, -1529.487237714), (-2982.555620066, -1529.561520806), (-2983.270715614, -1529.61085026), (-2984.699880583, -1529.728387246), (-2985.413805133, -1529.792501111), (-2986.828454417, -1529.974367331), (-2987.528277292, -1530.097123904), (-2988.908922426, -1530.423240118), (-2989.590563958, -1530.623124297), (-2990.940267727, -1531.080497783), (-2991.608857588, -1531.335748836), (-2992.277010257, -1531.592854518)],
                knots=[0, 0, 0, 0, 0.125, 0.125, 0.25, 0.25, 0.375, 0.375, 0.5, 0.5, 0.625, 0.625, 0.75, 0.75, 0.875, 0.875, 1, 1, 1, 1], degree=3))
            add(Edge.make_bspline(
                [(-2992.277010257, -1531.592854518), (-2992.955756651, -1531.939435253), (-2993.634043222, -1532.286654634), (-2994.59367389, -1532.887760624), (-2994.904398476, -1533.100840865), (-2995.504213394, -1533.557049018), (-2995.793962098, -1533.799262524), (-2996.355692286, -1534.308366315), (-2996.627469068, -1534.575540908), (-2997.146047797, -1535.144577483), (-2997.389727343, -1535.444346315), (-2998.062435015, -1536.370238882), (-2998.435296079, -1537.032021566), (-2999.105396536, -1538.400114352), (-2999.399895255, -1539.114773791), (-2999.850889981, -1540.565534506), (-3000.018354006, -1541.30270848), (-3000.307313274, -1542.78639827), (-3000.421613337, -1543.5343763), (-3000.541976558, -1545.052328418), (-3000.552730174, -1545.820003699), (-3000.564783968, -1546.585009656)],
                knots=[0, 0, 0, 0, 0.125, 0.125, 0.1875, 0.1875, 0.25, 0.25, 0.3125, 0.3125, 0.375, 0.375, 0.5, 0.5, 0.625, 0.625, 0.75, 0.75, 0.875, 0.875, 1, 1, 1, 1], degree=3))
            add(Edge.make_bspline(
                [(-3000.564783968, -1546.585009656), (-3000.548346381, -1547.335174442), (-3000.530105179, -1548.085230206), (-3000.452098136, -1549.582831723), (-3000.391892697, -1550.330350903), (-3000.206685187, -1551.821472543), (-3000.083351717, -1552.558989793), (-2999.762764878, -1554.010612062), (-2999.564870924, -1554.725107496), (-2999.066508249, -1556.123228981), (-2998.764721841, -1556.80645848), (-2998.064854081, -1558.143937976), (-2997.674913022, -1558.784960275), (-2996.817164397, -1559.997265575), (-2996.34861061, -1560.570531634), (-2995.316965243, -1561.638710254), (-2994.750135974, -1562.130524995), (-2994.18281326, -1562.621930766)],
                knots=[0, 0, 0, 0, 0.125, 0.125, 0.25, 0.25, 0.375, 0.375, 0.5, 0.5, 0.625, 0.625, 0.75, 0.75, 0.875, 0.875, 1, 1, 1, 1], degree=3))
            add(Edge.make_bspline(
                [(-2994.18281326, -1562.621930766), (-2993.481010256, -1563.180870752), (-2992.776811922, -1563.735482295), (-2991.263038474, -1564.6542859), (-2990.461988423, -1565.033883044), (-2989.222628157, -1565.534999618), (-2988.802120937, -1565.689208), (-2987.946202992, -1565.968578473), (-2987.515053252, -1566.091646221), (-2986.213257108, -1566.41737874), (-2985.334741874, -1566.57906271), (-2983.566858629, -1566.845909478), (-2982.676251584, -1566.948870539), (-2980.892432913, -1567.119662829), (-2979.999699152, -1567.187510135), (-2978.212640579, -1567.289337452), (-2977.318255963, -1567.322044433), (-2975.528325063, -1567.362731024), (-2974.632815117, -1567.371484112), (-2973.737288965, -1567.379892231)],
                knots=[0, 0, 0, 0, 0.125, 0.125, 0.25, 0.25, 0.3125, 0.3125, 0.375, 0.375, 0.5, 0.5, 0.625, 0.625, 0.75, 0.75, 0.875, 0.875, 1, 1, 1, 1], degree=3))
        make_face(mode=Mode.SUBTRACT)
    extrude(amount=-CUT_EXTRUDE2_DEPTH, mode=Mode.SUBTRACT)


solid = part.part
